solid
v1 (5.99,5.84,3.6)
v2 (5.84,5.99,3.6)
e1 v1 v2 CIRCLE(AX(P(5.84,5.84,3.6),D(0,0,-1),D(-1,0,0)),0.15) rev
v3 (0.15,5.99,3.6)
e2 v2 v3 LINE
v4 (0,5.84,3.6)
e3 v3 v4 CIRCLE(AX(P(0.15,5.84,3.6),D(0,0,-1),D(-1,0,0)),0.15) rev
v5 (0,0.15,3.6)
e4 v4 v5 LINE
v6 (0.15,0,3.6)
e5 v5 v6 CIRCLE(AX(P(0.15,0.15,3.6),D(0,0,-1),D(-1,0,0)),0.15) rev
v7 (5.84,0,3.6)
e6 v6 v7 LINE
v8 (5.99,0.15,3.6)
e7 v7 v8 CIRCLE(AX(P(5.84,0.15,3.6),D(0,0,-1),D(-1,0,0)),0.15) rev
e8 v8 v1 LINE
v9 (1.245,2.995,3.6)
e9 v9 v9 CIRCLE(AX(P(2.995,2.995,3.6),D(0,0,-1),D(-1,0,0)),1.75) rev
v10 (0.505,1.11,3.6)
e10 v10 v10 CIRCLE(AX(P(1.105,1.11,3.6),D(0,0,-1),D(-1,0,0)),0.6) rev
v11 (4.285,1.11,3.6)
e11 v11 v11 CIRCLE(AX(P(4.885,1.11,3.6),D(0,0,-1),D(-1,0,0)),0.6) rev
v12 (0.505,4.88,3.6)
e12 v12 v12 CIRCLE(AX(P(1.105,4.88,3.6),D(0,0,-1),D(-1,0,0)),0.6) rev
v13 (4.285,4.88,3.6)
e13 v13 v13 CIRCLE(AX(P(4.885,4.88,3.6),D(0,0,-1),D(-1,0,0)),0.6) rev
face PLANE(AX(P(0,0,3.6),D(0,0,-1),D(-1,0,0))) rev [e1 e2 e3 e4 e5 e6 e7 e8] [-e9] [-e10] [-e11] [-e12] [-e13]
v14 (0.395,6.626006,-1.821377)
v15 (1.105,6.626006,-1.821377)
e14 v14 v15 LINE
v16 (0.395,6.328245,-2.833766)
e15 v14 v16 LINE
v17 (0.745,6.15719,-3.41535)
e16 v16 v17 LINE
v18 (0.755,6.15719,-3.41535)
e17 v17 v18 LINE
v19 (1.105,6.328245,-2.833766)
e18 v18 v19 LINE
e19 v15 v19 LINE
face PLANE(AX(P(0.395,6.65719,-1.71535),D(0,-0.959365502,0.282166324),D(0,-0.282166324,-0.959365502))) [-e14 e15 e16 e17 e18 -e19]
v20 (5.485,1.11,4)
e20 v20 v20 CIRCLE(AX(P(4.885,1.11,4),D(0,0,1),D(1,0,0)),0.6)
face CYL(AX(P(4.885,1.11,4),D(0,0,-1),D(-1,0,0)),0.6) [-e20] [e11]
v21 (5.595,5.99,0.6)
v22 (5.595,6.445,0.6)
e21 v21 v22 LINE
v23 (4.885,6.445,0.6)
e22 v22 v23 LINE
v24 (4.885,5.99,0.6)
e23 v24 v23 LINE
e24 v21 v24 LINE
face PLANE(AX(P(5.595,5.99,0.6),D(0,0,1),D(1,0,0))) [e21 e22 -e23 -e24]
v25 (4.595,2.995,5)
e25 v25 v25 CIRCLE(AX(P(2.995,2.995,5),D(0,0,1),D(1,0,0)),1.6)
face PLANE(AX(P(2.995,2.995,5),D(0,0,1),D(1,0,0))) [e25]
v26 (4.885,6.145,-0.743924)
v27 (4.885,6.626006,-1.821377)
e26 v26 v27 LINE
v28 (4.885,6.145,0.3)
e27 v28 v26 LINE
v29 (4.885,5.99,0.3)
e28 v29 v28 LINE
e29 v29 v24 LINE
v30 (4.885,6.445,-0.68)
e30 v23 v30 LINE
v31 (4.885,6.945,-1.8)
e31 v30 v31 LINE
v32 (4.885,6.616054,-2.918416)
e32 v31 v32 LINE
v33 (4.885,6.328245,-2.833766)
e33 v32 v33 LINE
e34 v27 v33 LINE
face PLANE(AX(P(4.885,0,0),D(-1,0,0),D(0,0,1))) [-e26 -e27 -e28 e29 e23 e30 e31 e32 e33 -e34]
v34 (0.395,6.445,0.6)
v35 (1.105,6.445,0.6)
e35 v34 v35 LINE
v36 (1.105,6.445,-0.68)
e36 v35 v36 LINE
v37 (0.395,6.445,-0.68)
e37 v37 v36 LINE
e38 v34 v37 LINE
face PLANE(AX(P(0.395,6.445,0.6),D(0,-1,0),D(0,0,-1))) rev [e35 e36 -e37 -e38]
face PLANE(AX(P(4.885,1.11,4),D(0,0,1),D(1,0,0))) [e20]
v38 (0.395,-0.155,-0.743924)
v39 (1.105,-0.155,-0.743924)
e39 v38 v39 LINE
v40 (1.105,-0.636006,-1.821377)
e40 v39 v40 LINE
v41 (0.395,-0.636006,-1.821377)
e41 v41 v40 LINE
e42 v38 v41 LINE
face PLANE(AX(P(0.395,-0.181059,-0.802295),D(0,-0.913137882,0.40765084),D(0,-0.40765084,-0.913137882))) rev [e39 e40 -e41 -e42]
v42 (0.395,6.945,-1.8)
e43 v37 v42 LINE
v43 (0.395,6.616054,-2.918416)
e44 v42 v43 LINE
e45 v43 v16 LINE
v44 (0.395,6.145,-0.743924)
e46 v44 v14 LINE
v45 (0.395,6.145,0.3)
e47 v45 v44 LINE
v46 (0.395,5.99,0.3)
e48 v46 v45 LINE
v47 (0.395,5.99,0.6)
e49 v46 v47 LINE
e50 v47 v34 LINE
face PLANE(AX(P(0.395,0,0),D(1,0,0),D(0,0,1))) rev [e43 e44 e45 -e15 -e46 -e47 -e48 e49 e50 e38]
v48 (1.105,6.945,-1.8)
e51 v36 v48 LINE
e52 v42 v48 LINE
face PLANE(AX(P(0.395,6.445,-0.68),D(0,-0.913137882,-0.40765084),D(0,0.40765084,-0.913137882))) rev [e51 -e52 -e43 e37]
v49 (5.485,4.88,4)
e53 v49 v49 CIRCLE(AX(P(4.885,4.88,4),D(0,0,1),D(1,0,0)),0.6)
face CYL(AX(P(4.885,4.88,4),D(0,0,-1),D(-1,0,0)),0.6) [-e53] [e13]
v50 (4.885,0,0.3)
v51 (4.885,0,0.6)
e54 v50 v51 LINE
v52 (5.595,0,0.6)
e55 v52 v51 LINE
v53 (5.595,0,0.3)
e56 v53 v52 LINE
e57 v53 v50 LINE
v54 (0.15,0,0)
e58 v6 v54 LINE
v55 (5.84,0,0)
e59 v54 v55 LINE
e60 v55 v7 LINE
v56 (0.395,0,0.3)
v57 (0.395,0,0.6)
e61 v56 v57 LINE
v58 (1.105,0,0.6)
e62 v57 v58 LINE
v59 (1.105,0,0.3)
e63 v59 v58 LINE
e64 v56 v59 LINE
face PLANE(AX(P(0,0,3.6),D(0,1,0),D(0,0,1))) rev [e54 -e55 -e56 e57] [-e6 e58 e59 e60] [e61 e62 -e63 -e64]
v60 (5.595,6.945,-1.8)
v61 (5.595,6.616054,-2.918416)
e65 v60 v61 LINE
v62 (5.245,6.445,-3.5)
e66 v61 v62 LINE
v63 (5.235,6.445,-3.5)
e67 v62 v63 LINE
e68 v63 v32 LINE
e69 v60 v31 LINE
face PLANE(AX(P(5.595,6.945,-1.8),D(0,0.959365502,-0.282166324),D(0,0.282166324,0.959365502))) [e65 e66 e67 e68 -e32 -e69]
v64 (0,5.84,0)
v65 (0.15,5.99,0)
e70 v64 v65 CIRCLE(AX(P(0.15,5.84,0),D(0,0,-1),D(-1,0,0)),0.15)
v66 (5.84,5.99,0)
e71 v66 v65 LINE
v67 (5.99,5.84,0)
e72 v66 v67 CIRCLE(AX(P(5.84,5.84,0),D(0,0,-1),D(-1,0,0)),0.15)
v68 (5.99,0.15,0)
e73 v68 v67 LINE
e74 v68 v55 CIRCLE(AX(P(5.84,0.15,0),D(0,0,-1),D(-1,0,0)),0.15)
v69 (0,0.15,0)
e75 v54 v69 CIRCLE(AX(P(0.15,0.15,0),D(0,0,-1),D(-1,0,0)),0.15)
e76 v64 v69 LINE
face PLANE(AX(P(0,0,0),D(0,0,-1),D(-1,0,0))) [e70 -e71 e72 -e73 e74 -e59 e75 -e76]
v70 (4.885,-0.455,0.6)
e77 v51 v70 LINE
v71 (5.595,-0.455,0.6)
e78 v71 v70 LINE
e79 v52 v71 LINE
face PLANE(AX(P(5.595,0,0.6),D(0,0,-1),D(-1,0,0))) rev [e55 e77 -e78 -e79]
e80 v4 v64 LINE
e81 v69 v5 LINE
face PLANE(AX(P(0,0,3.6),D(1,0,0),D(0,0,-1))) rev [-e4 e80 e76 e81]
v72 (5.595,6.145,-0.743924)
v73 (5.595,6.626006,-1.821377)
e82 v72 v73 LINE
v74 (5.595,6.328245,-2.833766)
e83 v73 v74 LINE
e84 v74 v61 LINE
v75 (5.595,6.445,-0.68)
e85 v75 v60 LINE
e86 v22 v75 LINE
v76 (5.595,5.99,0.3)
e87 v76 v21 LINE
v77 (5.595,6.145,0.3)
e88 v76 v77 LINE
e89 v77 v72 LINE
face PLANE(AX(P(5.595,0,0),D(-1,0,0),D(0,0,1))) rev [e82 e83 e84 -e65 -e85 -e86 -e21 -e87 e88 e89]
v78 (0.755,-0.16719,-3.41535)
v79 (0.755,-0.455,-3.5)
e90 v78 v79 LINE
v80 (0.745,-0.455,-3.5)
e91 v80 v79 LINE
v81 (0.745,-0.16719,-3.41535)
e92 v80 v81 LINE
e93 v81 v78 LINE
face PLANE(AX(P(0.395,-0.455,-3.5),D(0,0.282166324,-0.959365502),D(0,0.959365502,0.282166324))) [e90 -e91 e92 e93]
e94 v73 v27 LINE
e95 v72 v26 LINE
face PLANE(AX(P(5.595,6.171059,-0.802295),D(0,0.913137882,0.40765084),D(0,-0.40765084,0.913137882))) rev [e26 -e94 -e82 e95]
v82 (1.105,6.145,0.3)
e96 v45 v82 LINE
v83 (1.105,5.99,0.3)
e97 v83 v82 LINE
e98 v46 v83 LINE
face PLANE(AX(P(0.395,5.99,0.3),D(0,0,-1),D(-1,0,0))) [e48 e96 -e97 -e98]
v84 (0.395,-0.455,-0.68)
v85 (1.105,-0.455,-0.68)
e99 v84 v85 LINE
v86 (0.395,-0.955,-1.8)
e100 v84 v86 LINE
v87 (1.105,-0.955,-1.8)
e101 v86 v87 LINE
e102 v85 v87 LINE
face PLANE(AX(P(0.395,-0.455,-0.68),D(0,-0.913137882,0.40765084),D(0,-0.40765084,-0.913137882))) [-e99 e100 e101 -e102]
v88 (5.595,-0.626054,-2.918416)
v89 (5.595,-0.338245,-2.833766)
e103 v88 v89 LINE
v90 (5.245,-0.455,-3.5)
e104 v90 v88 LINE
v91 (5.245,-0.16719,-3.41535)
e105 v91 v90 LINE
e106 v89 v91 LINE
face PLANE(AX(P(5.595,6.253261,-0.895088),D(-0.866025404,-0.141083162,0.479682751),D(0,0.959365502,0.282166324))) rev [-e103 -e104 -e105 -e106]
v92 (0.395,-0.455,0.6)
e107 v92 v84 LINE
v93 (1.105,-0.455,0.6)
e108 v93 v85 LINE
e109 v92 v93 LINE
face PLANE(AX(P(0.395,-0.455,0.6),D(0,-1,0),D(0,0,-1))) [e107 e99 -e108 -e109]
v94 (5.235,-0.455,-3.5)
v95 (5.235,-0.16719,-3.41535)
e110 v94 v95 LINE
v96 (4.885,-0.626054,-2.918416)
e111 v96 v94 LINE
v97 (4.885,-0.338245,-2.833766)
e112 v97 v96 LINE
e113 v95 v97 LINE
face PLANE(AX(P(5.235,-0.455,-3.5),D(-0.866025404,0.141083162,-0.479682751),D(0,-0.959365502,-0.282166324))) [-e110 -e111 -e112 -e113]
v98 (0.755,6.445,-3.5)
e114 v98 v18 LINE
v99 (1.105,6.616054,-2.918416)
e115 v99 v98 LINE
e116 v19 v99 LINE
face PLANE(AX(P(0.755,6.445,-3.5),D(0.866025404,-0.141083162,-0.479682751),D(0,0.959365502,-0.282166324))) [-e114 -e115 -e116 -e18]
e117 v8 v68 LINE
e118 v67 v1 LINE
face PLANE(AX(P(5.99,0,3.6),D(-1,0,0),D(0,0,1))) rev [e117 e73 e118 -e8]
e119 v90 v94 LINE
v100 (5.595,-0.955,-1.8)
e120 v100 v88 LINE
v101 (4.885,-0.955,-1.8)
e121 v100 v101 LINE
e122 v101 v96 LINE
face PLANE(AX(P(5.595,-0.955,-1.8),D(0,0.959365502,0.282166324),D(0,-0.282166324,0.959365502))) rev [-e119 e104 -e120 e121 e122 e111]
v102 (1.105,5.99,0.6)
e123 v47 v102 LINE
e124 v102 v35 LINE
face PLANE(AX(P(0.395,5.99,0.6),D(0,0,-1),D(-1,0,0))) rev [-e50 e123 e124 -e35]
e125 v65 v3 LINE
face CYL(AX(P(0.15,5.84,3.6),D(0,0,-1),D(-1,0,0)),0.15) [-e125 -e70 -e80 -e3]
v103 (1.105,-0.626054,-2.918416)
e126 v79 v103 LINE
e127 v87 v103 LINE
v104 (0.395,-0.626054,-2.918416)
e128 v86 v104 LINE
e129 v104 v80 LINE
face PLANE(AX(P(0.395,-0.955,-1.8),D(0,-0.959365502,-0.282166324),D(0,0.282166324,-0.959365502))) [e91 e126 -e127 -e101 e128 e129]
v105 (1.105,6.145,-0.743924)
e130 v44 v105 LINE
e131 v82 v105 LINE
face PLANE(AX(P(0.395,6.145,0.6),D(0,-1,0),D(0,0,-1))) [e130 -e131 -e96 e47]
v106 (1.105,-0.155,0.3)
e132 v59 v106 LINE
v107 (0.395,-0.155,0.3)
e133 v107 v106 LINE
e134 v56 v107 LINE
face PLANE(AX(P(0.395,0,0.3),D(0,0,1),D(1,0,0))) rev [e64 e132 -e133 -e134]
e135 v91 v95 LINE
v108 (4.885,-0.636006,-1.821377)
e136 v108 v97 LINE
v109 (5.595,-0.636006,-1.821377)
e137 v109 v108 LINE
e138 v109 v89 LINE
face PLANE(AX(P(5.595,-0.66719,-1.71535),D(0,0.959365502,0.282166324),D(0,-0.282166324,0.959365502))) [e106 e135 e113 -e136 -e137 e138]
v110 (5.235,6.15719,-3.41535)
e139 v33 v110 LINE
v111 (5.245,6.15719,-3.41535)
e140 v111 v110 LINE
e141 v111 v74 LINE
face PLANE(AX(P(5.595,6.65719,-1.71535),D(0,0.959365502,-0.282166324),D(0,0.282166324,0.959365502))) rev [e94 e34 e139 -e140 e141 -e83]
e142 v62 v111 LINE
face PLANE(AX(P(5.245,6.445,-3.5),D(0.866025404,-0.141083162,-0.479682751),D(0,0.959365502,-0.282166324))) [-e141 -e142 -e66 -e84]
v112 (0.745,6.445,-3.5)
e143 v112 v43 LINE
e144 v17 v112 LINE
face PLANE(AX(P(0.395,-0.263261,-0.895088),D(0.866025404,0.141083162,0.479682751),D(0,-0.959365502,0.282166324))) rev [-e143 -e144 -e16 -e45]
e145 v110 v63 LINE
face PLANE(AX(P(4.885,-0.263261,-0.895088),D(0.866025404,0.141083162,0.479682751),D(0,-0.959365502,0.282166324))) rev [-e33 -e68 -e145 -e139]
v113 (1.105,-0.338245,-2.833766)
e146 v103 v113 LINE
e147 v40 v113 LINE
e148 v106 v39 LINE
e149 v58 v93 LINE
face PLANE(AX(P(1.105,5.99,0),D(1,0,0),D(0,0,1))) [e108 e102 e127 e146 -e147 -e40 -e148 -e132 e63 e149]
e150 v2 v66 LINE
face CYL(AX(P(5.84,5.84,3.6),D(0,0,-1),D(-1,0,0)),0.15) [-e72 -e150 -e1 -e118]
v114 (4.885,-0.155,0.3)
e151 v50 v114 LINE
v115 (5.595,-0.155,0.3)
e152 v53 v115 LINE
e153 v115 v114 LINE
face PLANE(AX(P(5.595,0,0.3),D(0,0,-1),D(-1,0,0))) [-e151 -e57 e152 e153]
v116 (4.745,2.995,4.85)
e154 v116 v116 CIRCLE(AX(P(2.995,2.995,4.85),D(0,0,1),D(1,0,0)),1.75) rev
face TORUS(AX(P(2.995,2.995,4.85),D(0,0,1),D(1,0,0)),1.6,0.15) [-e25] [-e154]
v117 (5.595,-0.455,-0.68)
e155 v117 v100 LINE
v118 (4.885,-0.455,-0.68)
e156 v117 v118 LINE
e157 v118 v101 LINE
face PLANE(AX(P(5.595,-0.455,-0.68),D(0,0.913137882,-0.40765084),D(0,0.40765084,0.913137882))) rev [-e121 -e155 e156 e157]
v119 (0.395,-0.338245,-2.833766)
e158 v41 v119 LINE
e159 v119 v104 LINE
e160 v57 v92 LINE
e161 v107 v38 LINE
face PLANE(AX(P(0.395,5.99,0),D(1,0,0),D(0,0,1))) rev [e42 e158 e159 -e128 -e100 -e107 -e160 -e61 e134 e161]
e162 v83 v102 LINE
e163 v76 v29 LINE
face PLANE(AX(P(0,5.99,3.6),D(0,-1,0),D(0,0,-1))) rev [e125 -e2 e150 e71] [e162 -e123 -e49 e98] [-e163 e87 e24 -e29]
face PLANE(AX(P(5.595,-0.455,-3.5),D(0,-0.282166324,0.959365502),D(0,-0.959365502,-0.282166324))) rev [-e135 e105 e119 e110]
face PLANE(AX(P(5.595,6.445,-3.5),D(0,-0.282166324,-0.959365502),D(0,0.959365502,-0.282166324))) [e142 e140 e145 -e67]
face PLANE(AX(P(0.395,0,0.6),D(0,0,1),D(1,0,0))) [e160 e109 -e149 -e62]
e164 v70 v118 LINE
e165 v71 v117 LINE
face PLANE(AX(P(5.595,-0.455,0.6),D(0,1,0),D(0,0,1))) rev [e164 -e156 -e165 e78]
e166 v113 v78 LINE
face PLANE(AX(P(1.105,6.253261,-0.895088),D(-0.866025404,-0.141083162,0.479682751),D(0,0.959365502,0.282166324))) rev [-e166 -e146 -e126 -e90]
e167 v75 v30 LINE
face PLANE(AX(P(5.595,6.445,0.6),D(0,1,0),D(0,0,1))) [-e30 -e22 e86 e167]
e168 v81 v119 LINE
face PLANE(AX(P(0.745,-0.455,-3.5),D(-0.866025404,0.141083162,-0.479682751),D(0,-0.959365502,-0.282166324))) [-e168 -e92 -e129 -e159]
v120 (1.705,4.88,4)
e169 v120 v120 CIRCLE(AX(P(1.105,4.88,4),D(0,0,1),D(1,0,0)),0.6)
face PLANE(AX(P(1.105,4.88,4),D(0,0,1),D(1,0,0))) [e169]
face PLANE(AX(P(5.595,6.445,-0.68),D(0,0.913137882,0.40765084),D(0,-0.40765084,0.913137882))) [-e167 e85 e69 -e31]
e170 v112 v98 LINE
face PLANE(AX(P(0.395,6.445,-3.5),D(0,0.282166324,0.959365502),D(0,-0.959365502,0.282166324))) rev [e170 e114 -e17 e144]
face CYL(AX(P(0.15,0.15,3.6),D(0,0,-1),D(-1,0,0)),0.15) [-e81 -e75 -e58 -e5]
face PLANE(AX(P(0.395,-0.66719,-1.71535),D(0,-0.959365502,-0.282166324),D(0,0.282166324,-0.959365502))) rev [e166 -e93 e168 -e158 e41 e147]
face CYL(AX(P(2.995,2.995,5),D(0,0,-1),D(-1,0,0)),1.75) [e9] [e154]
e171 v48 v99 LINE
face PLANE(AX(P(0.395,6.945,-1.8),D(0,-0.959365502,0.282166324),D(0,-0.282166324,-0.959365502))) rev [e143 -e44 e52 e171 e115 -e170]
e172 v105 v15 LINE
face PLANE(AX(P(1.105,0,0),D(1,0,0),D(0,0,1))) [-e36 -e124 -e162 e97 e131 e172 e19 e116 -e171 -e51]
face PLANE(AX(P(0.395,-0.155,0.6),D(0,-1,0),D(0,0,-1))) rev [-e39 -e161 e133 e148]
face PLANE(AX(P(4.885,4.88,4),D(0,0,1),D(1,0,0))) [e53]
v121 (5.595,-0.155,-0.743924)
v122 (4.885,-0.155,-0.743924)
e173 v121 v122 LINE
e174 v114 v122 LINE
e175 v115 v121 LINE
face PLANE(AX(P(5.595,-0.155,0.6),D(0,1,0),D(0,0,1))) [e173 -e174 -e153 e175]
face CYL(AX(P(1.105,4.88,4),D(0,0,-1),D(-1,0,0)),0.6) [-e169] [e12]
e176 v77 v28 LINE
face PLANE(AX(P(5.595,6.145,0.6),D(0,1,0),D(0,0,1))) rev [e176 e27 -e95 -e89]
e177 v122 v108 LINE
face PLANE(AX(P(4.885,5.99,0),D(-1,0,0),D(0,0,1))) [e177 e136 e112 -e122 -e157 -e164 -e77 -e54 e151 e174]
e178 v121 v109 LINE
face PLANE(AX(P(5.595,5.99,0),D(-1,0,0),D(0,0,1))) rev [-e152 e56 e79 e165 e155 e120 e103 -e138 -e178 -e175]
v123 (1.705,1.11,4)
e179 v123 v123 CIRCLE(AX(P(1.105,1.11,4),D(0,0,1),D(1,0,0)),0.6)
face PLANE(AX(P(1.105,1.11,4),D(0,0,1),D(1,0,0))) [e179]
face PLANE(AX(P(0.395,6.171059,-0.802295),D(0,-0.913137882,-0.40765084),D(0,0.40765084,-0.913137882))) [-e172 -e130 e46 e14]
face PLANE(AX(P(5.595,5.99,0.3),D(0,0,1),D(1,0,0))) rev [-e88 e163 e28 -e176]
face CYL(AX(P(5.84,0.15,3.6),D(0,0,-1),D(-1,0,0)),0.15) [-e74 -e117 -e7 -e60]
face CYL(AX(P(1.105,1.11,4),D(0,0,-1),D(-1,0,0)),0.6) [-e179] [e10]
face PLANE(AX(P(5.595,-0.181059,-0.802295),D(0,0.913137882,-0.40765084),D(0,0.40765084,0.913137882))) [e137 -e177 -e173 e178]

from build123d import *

# Parameters (mm, degrees)
SKETCH2_W                 = 5.99
SKETCH2_H                 = 5.99
BOSS_EXTRUDE1_DEPTH       = 3.6
SKETCH3_R                 = 1.75
BOSS_EXTRUDE2_DEPTH       = 1.4
EXTRUDE_THIN1_DEPTH       = 0.355
CHAMFER2_SIZE             = 0.35
CHAMFER2_SIZE2            = 0.606217783
CHAMFER2_OF_MIRROR1_SIZE2 = 0.35
CHAMFER2_OF_MIRROR1_SIZE  = 0.606217783
FILLET1_R                 = 0.15
SKETCH5_R                 = 0.6
BOSS_EXTRUDE3_DEPTH       = 0.4


# Read off the part's stored shape, not the designer's step: Mirror2
with BuildPart() as part:
    # Sketch2 → Boss-Extrude1 (new body)
    with BuildSketch(Plane.XY):
        with Locations((2.995, 2.995)):
            Rectangle(SKETCH2_W, SKETCH2_H)
    extrude(amount=BOSS_EXTRUDE1_DEPTH)

    # Sketch3 → Boss-Extrude2 (add)
    with BuildSketch(Plane.XY.offset(3.6)):
        with Locations(Location((2.995, 2.995, 0), (0, 0, 180))):
            Circle(SKETCH3_R)
    extrude(amount=BOSS_EXTRUDE2_DEPTH)

    # Sketch4 → Extrude-Thin1 (add, symmetric)
    with BuildSketch(Plane(origin=(5.24, 0, 0), x_dir=(0, 0, -1), z_dir=(1, 0, 0))):
        Polygon((-0.6, 5.99), (-0.6, 6.445), (0.68, 6.445), (1.8, 6.945), (3.5, 6.445), (3.415350103, 6.15719035), (1.821377167, 6.626005919), (0.743923909, 6.145), (-0.3, 6.145), (-0.3, 5.99), align=None)
    extrude_thin1 = extrude(amount=EXTRUDE_THIN1_DEPTH, both=True)

    # Chamfer2
    chamfer2_edges = [part.edges().sort_by_distance(p)[0] for p in [
        (5.595, 6.301095175, -3.457675051),
        (4.885, 6.301095175, -3.457675051),
    ]]
    chamfer2_side = [part.faces().sort_by_distance(p)[0] for p in [
        (5.24, 6.301095175, -3.457675051),
    ]]
    chamfer(chamfer2_edges, length=CHAMFER2_SIZE, length2=CHAMFER2_SIZE2, reference=chamfer2_side[0])

    # Mirror1: Extrude-Thin1 across plane
    add(extrude_thin1.mirror(Plane(origin=(2.995, 0, 0), x_dir=(0, 0, 1), z_dir=(1, 0, 0))))

    # Chamfer2 of Mirror1
    chamfer2_of_mirror1_edges = [part.edges().sort_by_distance(p)[0] for p in [
        (0.395, 6.301095175, -3.457675051),
        (1.105, 6.301095175, -3.457675051),
    ]]
    chamfer(chamfer2_of_mirror1_edges, length=CHAMFER2_OF_MIRROR1_SIZE, length2=CHAMFER2_OF_MIRROR1_SIZE2)

    # Mirror2: part across plane


with BuildPart() as part_1:
    add(part.part)
    add(part.part.mirror(Plane.ZX.offset(2.995)))

    # Fillet1
    fillet1_edges = [part_1.edges().sort_by_distance(p)[0] for p in [
        (4.745, 2.995, 5),
        (0, 5.99, 1.8),
        (5.99, 5.99, 1.8),
        (5.99, 0, 1.8),
        (0, 0, 1.8),
    ]]
    fillet(fillet1_edges, radius=FILLET1_R)

    # Sketch5 → Boss-Extrude3 (add)
    with BuildSketch(Plane.XY.offset(3.6)):
        with Locations(Location((1.105, 4.88, 0), (0, 0, 180))):
            Circle(SKETCH5_R)
        with Locations(Location((4.885, 4.88, 0), (0, 0, 180))):
            Circle(SKETCH5_R)
        with Locations(Location((4.885, 1.11, 0), (0, 0, 180))):
            Circle(SKETCH5_R)
        with Locations(Location((1.105, 1.11, 0), (0, 0, 180))):
            Circle(SKETCH5_R)
    extrude(amount=BOSS_EXTRUDE3_DEPTH)


solid = part_1.part
